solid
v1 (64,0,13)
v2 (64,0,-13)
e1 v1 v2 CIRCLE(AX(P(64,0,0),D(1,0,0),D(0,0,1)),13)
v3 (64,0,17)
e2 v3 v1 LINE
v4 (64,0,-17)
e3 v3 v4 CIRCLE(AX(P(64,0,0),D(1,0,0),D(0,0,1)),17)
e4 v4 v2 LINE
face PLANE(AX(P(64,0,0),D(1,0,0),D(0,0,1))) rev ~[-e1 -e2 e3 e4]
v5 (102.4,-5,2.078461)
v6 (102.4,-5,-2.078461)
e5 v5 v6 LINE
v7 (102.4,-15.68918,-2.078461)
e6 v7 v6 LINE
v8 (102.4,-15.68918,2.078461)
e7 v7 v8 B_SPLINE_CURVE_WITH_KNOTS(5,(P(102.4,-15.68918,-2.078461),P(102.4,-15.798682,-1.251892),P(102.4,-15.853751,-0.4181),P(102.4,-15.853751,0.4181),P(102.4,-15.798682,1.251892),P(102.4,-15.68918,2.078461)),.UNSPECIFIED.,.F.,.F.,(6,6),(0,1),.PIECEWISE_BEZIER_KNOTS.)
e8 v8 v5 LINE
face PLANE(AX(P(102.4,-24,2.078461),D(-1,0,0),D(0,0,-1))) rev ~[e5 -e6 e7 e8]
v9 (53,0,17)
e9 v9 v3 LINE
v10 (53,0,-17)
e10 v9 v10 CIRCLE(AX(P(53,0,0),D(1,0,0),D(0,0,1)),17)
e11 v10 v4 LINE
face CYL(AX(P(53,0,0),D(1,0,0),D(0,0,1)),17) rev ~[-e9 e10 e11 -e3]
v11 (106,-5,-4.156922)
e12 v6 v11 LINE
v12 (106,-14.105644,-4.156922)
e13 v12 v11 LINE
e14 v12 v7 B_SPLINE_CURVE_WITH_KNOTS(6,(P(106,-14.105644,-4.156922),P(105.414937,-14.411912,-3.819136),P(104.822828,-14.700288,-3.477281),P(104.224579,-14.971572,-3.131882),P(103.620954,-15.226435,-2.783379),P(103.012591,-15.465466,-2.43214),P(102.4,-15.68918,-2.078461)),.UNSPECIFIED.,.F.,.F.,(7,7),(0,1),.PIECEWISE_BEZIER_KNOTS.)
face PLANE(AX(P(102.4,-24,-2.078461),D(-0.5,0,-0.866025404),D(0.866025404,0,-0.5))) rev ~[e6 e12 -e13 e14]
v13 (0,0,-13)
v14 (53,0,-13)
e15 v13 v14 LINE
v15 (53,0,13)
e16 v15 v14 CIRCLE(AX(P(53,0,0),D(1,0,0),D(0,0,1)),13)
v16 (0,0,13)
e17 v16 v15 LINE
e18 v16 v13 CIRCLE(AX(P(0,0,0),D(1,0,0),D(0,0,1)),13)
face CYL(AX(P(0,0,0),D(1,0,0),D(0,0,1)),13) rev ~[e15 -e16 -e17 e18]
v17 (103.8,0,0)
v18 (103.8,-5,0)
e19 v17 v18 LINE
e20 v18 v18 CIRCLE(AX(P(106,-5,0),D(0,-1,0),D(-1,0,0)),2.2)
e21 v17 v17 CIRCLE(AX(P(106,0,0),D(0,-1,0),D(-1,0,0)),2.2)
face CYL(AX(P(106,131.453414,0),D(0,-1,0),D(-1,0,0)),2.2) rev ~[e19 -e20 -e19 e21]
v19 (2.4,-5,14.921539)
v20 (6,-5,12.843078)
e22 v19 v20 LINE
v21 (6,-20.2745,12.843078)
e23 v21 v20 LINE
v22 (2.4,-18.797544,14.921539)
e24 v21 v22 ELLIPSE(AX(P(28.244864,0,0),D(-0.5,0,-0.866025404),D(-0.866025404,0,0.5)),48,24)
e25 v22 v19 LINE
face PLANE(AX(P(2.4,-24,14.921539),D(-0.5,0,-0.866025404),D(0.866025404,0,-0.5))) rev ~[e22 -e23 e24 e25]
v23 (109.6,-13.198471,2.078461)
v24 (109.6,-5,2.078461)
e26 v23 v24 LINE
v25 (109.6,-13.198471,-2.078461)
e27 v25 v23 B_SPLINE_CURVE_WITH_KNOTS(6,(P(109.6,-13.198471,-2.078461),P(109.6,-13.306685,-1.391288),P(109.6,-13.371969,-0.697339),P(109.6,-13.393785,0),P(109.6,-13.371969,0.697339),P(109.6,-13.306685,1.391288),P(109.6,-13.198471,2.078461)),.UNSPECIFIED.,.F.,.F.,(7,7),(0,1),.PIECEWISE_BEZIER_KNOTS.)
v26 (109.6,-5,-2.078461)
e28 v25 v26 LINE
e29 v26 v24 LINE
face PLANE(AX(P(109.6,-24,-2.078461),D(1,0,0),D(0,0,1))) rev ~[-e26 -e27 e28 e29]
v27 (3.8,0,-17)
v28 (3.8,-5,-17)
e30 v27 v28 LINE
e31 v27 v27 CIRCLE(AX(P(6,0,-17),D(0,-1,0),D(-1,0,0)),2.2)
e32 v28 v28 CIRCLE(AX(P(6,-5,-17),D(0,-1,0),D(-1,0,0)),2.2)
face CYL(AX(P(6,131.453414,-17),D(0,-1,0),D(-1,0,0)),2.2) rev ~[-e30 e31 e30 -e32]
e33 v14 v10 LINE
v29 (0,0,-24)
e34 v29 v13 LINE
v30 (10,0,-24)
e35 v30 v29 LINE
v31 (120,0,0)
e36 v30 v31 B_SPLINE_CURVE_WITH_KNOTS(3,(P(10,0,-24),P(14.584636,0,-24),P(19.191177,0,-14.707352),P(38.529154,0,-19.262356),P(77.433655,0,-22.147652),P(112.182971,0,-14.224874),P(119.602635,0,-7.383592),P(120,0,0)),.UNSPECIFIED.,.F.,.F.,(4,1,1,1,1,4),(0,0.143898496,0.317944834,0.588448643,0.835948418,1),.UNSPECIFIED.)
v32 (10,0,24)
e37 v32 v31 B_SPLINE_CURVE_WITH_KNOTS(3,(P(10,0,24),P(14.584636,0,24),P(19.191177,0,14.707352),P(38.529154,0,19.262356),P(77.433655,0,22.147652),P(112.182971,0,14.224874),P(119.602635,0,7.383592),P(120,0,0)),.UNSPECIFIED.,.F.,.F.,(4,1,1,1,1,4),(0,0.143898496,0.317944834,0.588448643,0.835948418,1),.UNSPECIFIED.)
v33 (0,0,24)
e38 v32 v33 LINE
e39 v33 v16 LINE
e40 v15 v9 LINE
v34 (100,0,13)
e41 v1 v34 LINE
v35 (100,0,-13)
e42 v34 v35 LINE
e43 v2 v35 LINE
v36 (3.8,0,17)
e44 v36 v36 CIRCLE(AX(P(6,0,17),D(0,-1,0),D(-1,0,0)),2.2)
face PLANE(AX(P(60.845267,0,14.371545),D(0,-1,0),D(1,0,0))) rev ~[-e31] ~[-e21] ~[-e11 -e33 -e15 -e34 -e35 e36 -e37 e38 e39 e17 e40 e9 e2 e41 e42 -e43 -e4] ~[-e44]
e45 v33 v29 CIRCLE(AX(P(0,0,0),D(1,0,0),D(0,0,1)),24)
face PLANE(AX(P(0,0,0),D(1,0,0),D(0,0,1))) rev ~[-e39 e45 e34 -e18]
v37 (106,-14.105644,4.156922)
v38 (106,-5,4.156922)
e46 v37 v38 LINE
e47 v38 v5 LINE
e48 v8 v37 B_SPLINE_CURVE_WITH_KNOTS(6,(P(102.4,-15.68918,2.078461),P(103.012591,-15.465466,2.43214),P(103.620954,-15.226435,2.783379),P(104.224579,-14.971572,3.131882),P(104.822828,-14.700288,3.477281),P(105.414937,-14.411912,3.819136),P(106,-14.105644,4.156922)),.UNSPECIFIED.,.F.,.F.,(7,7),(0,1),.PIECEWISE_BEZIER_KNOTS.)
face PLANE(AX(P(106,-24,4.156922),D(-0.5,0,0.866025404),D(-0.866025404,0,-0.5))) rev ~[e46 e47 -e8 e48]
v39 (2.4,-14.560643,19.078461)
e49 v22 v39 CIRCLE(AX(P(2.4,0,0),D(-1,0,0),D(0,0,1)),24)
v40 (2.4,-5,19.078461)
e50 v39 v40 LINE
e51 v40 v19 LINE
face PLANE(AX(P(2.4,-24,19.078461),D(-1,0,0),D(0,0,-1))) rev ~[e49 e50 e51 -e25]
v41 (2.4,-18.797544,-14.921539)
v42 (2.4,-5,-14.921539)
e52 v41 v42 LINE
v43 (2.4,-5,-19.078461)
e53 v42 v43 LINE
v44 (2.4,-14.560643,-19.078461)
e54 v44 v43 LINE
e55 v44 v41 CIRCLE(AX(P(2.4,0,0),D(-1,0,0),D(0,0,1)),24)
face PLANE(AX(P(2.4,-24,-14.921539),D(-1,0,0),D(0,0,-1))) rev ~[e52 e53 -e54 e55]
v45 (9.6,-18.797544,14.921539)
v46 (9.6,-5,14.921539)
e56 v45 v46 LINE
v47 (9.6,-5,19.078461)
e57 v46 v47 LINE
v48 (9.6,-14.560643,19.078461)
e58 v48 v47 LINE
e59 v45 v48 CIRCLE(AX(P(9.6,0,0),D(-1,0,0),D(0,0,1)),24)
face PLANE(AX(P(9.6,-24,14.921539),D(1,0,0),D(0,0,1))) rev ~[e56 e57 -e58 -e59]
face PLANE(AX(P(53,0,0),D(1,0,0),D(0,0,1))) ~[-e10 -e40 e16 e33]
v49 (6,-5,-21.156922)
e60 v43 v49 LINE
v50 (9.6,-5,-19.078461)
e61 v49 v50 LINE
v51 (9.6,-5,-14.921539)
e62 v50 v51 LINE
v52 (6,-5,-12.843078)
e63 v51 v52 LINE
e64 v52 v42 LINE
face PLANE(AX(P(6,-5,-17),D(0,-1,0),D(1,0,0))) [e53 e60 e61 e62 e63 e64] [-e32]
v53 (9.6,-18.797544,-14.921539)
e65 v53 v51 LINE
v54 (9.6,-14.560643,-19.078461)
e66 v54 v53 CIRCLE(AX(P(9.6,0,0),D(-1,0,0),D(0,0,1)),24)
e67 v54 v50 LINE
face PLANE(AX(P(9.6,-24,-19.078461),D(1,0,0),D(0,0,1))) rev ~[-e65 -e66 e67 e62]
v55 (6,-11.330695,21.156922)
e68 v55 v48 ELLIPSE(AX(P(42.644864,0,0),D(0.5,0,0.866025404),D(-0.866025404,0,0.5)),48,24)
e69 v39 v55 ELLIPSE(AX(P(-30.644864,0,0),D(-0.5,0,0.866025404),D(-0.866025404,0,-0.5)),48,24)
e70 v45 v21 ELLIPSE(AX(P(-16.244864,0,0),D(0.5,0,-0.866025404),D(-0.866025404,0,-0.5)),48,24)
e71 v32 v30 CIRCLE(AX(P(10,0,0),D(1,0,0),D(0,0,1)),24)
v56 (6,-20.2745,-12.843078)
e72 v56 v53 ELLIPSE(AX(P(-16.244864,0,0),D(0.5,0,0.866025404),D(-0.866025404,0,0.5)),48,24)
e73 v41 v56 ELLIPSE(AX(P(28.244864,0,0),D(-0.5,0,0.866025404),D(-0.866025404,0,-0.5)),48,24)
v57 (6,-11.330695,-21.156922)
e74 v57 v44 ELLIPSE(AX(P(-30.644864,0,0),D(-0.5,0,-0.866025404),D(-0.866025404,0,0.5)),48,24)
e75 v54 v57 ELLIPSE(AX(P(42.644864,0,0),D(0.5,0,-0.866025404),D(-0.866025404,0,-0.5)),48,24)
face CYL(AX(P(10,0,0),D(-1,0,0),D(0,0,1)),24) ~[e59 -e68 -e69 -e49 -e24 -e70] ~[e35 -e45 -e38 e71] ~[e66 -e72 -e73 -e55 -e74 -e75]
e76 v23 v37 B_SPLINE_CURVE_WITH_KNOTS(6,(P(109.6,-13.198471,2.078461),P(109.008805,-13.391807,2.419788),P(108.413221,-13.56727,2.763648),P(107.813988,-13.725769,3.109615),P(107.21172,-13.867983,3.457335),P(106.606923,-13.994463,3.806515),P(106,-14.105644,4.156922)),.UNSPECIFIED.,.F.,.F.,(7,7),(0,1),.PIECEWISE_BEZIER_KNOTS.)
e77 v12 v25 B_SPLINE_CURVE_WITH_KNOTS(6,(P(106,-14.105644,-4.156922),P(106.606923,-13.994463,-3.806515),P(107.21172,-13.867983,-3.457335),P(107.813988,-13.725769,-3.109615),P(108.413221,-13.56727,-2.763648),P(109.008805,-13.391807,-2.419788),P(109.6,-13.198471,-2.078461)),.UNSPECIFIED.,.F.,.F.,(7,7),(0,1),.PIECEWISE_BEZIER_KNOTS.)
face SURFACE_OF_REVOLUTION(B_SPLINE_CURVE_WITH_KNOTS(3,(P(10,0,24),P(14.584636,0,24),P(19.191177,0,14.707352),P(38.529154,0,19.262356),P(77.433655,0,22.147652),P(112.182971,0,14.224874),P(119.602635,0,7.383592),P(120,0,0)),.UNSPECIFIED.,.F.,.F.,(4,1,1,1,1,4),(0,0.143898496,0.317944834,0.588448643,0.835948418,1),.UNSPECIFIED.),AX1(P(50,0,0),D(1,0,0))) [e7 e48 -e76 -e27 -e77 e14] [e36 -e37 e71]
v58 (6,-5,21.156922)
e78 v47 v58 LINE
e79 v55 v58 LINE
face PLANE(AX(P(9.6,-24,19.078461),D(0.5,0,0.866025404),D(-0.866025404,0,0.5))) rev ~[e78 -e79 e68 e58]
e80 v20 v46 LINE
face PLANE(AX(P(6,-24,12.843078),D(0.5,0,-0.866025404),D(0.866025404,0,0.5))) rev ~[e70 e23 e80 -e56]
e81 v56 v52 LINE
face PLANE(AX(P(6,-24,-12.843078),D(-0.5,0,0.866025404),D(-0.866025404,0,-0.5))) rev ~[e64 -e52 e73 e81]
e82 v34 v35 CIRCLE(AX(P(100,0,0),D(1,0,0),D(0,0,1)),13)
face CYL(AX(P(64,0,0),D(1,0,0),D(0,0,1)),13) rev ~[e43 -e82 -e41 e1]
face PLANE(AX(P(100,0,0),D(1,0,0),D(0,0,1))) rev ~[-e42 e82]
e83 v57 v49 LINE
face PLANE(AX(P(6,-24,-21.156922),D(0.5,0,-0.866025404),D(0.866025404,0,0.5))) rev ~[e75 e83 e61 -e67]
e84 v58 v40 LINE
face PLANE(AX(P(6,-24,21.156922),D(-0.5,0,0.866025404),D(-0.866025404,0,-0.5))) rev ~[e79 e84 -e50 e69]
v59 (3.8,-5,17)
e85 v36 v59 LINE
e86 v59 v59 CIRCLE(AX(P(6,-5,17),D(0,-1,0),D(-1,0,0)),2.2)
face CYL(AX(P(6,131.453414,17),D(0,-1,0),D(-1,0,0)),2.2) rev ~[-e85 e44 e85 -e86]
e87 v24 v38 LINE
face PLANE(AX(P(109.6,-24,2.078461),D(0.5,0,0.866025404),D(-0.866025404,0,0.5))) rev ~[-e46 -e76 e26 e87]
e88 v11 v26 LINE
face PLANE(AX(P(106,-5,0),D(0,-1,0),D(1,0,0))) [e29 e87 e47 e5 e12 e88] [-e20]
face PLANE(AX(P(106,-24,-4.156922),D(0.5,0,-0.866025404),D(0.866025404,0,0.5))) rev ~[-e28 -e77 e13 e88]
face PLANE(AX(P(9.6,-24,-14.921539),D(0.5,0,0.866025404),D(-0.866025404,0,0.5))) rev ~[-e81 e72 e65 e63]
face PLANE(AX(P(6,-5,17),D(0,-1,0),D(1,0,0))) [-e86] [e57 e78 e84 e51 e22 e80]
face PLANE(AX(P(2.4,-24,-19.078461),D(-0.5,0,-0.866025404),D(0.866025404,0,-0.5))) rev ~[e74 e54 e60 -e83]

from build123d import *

# Parameters (mm, degrees)
F1_ANGLE = 180
F3_D     = 4.4
F6_R     = 2.2
F7_DEPTH = 19


with BuildPart() as f1:
    # F0 (on Front) → F1 (revolve)
    with BuildSketch(Plane.XZ):
        with BuildLine():
            Line((0, 24), (0, 13))
            Line((0, 13), (53, 13))
            Line((53, 13), (53, 17))
            Line((53, 17), (64, 17))
            Line((64, 17), (64, 13))
            Line((64, 13), (100, 13))
            Line((100, 13), (100, 0))
            Line((100, 0), (120, 0))
            add(Edge.make_bspline(
                [(10, 24), (14.5846361259, 24), (19.1911767131, 14.7073521681), (38.5291539725, 19.2623560501), (77.4336550451, 22.1476524592), (112.1829708833, 14.2248736546), (119.6026350157, 7.3835916313), (120, 0)],
                knots=[0, 0, 0, 0, 0.1438984957, 0.3179448336, 0.5884486431, 0.835948418, 1, 1, 1, 1], degree=3))
            Line((10, 24), (0, 24))
        make_face()
    revolve(axis=Axis((50, 0, 0), (1, 0, 0)), revolution_arc=F1_ANGLE)

    # F3 (through all)
    with Locations(Plane(origin=(0, 0, 0), x_dir=(1, 0, 0), z_dir=(0, 1, 0))):
        with Locations((6, -17), (6, 17), (106, 0)):
            Hole(F3_D / 2)

    # F6 (on plane+point) → F7 (cut)
    with BuildSketch(Plane.XZ.offset(24)):
        Polygon((9.6, 14.9215390309), (9.6, 19.0784609691), (6, 21.1569219382), (2.4, 19.0784609691), (2.4, 14.9215390309), (6, 12.8430780618), align=None)
        with Locations((6, 17)):
            Circle(F6_R, mode=Mode.SUBTRACT)
        Polygon((9.6, -19.0784609691), (9.6, -14.9215390309), (6, -12.8430780618), (2.4, -14.9215390309), (2.4, -19.0784609691), (6, -21.1569219382), align=None)
        with Locations((6, -17)):
            Circle(F6_R, mode=Mode.SUBTRACT)
        Polygon((109.6, -2.0784609691), (109.6, 2.0784609691), (106, 4.1569219382), (102.4, 2.0784609691), (102.4, -2.0784609691), (106, -4.1569219382), align=None)
        with Locations((106, 0)):
            Circle(F6_R, mode=Mode.SUBTRACT)
    extrude(amount=-F7_DEPTH, mode=Mode.SUBTRACT)


solid = f1.part
